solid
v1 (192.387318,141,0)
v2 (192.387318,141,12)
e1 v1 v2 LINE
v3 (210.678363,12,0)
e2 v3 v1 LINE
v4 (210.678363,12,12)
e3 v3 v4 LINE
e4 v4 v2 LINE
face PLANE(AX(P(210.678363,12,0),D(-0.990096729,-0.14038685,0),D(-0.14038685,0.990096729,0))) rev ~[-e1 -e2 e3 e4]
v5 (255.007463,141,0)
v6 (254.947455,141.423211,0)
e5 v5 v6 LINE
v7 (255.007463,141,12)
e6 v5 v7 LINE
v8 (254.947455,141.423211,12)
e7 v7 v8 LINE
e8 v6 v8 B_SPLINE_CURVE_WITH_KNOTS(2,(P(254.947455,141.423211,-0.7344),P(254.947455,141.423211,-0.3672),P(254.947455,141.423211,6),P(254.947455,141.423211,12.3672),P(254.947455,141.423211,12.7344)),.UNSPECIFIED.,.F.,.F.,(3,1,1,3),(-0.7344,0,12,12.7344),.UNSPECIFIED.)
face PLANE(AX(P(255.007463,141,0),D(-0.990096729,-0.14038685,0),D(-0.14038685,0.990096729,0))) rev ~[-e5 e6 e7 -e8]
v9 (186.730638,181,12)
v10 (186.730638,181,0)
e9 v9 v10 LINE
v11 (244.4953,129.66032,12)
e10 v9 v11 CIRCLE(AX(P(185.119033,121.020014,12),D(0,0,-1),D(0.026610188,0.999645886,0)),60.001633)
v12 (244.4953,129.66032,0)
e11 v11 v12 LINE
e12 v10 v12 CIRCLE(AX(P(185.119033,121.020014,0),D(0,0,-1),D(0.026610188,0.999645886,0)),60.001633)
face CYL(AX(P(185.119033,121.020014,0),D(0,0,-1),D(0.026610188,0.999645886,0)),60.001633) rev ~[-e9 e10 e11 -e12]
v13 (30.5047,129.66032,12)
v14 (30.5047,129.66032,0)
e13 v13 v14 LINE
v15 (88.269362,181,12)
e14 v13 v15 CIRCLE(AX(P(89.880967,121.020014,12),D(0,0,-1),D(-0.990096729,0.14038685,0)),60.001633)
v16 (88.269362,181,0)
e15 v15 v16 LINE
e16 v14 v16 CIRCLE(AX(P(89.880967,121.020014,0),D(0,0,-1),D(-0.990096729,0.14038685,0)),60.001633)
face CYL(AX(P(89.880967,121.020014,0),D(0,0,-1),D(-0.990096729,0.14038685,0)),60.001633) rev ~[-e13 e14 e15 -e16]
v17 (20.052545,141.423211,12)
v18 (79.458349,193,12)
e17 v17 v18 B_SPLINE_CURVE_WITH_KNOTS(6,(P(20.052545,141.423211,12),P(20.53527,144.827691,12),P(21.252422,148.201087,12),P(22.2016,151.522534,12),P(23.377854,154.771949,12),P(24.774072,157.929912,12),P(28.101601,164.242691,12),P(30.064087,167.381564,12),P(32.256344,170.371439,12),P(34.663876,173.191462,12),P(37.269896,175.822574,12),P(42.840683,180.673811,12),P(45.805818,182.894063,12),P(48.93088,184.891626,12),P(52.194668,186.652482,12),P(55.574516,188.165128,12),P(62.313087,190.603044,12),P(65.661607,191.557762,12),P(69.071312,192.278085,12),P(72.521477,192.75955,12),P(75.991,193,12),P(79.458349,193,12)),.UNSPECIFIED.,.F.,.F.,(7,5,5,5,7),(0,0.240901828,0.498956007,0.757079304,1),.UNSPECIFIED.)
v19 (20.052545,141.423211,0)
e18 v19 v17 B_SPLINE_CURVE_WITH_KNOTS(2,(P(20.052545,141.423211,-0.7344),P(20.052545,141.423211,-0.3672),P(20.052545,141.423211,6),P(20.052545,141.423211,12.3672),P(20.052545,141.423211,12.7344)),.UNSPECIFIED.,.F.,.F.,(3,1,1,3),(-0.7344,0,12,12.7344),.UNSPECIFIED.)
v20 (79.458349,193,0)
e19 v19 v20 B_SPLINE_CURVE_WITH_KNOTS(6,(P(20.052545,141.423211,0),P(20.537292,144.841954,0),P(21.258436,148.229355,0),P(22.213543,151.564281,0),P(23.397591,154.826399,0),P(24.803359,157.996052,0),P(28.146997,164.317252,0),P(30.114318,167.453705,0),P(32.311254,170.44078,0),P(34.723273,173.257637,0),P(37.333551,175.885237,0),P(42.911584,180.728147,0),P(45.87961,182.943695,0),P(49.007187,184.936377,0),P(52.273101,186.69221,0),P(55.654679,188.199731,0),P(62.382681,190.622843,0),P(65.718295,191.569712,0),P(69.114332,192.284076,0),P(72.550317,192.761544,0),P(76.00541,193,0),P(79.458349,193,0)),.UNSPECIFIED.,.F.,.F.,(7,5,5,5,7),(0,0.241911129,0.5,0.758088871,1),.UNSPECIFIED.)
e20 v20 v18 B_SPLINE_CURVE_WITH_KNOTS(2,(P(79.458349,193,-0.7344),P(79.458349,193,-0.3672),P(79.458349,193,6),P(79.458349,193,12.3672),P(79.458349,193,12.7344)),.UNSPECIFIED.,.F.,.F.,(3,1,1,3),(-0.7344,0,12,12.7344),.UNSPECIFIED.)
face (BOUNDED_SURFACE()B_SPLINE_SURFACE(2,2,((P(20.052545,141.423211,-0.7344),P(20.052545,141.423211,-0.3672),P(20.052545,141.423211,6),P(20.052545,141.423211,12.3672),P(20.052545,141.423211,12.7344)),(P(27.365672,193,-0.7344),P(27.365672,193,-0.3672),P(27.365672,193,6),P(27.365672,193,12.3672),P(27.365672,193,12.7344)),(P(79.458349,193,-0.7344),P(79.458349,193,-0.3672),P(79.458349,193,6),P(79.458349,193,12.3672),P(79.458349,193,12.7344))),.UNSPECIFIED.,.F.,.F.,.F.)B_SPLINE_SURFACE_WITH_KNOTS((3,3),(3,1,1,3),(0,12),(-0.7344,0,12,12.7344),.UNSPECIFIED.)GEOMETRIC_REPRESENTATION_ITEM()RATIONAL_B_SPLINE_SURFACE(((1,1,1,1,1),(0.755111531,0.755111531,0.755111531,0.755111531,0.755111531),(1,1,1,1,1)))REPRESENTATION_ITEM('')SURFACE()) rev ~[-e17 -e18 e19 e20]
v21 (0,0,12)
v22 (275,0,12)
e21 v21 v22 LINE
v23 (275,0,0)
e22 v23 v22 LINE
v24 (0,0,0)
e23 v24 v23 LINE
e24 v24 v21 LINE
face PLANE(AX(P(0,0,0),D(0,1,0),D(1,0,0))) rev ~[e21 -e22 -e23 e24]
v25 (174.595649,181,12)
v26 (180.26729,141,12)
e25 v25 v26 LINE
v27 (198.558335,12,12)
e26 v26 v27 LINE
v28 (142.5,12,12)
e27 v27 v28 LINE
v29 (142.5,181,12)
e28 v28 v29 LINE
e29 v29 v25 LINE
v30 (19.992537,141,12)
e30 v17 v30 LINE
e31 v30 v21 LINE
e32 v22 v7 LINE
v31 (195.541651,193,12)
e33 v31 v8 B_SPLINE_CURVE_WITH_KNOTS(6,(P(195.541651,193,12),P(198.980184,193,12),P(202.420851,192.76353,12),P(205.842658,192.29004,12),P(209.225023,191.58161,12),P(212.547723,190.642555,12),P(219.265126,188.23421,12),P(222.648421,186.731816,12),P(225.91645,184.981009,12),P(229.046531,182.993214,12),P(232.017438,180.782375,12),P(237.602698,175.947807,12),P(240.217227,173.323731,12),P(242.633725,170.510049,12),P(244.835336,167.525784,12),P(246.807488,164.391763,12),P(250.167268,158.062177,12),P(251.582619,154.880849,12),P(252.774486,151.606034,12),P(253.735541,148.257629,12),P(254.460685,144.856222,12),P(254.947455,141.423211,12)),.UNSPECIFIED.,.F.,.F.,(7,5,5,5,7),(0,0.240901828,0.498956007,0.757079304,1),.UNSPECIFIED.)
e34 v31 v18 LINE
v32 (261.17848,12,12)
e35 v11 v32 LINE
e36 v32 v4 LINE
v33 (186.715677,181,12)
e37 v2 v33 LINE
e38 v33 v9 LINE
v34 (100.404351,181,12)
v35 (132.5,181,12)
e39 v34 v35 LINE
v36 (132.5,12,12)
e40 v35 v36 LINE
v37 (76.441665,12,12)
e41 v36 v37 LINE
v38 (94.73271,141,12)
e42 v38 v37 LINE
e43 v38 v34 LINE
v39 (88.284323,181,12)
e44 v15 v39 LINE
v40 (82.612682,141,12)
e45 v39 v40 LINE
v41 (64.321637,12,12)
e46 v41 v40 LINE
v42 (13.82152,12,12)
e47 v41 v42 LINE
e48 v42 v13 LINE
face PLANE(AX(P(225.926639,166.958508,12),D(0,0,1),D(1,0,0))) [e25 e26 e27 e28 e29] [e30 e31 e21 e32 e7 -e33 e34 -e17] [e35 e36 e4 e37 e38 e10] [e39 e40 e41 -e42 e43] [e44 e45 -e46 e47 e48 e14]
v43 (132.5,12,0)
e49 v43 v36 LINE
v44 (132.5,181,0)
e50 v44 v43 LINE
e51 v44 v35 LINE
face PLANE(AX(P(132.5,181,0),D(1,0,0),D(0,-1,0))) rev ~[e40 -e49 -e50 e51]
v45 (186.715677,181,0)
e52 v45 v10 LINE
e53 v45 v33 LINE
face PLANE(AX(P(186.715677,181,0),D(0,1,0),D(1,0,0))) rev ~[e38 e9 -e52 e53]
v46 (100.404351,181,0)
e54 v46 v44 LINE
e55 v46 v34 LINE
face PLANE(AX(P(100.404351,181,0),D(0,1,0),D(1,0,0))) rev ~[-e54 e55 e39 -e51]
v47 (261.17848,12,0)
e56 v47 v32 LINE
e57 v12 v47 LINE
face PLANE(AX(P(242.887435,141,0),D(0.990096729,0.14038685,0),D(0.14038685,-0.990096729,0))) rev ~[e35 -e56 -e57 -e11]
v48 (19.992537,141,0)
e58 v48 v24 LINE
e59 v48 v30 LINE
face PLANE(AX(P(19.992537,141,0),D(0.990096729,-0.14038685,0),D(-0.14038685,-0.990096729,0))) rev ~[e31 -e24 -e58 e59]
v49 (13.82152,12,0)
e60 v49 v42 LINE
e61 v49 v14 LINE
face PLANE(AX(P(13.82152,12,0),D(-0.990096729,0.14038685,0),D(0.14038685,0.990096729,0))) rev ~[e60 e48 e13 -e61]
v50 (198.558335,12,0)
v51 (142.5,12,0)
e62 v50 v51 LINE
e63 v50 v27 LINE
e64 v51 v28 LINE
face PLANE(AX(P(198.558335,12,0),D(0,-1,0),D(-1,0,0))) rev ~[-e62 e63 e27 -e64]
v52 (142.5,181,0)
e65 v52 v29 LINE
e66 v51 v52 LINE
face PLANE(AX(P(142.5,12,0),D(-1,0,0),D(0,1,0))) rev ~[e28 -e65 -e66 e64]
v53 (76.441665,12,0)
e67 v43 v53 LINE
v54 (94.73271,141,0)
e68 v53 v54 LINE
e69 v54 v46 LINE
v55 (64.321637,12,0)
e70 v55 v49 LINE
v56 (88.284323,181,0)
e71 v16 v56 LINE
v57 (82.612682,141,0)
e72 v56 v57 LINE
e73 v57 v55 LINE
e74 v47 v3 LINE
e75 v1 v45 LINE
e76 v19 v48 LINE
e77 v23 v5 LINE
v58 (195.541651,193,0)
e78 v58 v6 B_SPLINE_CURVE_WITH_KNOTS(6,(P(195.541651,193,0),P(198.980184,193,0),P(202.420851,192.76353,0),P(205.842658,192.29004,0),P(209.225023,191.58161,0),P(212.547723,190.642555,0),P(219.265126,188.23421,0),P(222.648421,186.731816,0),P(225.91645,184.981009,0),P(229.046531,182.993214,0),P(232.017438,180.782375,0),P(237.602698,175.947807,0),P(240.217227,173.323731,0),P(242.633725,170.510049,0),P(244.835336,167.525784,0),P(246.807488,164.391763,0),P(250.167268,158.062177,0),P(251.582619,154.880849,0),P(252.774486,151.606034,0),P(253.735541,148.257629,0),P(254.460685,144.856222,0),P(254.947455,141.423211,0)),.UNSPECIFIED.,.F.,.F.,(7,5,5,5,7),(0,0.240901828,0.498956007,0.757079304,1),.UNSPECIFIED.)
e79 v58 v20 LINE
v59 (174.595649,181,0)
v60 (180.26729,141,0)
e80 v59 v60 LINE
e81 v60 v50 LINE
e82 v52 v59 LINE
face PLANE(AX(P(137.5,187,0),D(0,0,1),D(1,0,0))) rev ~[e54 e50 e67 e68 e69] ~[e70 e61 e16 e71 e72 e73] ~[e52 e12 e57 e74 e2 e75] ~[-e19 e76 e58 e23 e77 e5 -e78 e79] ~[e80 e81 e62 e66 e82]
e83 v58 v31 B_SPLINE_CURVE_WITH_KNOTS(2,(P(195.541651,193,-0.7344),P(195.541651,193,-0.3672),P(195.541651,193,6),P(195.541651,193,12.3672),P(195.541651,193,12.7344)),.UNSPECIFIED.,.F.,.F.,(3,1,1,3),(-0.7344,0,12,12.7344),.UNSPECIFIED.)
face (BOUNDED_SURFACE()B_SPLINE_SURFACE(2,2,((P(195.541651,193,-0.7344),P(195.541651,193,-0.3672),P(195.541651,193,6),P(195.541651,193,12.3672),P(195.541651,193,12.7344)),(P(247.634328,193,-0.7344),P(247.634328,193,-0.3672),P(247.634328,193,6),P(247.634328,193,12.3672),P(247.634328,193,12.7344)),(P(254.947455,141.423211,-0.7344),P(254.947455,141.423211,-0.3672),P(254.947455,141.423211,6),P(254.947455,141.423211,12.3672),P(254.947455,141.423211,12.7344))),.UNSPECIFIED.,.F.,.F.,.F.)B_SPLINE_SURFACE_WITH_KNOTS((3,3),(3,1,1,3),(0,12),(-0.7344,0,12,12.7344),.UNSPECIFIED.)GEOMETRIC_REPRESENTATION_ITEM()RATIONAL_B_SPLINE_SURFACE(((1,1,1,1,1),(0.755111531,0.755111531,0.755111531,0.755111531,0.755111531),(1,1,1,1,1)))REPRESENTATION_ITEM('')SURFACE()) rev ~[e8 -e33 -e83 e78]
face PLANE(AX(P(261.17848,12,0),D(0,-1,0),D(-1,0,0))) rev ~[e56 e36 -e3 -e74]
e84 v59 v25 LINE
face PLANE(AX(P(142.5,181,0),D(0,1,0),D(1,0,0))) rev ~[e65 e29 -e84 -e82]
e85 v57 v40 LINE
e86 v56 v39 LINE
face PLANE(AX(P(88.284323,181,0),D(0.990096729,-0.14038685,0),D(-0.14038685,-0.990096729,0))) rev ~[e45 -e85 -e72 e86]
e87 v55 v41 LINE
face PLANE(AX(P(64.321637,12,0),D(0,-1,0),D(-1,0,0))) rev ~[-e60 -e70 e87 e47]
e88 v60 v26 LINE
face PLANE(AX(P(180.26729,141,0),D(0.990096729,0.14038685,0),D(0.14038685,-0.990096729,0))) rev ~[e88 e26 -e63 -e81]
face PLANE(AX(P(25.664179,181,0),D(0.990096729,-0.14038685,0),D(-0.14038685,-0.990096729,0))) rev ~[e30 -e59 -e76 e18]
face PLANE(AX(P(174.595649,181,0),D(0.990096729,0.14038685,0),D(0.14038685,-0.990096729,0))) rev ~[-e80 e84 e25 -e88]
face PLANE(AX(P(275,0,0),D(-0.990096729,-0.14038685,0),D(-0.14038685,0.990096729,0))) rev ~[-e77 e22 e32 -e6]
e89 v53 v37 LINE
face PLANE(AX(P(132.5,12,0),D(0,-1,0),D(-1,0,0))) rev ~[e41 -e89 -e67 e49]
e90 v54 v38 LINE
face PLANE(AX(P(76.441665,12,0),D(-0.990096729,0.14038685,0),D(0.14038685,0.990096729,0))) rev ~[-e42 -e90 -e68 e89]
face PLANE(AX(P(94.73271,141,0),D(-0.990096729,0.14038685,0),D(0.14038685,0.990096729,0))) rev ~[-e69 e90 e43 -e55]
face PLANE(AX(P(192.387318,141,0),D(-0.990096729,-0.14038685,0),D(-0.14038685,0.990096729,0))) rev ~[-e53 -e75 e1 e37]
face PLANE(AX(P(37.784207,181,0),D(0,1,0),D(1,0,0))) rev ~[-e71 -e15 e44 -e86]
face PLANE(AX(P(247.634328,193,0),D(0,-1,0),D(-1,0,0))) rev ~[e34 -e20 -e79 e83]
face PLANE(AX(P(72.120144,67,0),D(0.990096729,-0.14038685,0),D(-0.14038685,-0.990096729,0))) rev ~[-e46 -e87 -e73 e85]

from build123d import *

# Parameters (mm, degrees)
F1_DEPTH    = 12
F2_T1_DEPTH = 12
F3_R        = 60


# Not quite as in the source:
# - a fillet or chamfer that OpenCascade refuses, or shapes differently, is made with other operations: its cross-section is extruded or revolved along the edge and cut away or added


with BuildPart() as f1:
    # F0 (on Top) → F1 (new body)
    with BuildSketch(Plane.XY):
        Polygon((132.5, 193), (132.5, 181), (137.5, 181), (142.5, 181), (142.5, 193), (137.5, 193), align=None)
        Polygon((27.3656716418, 193), (25.6641791045, 181), (37.7842070275, 181), (39.4856995648, 193), align=None)
        Polygon((25.6641791045, 181), (19.9925373134, 141), (32.1125652364, 141), (37.7842070275, 181), align=None)
        Polygon((19.9925373134, 141), (18.2910447761, 129), (30.4110726991, 129), (32.1125652364, 141), align=None)
        Polygon((237.2157929725, 181), (242.8874347636, 141), (255.0074626866, 141), (249.3358208955, 181), align=None)
        Polygon((235.5143004352, 193), (237.2157929725, 181), (249.3358208955, 181), (247.6343283582, 193), align=None)
        Polygon((242.8874347636, 141), (244.5889273009, 129), (256.7089552239, 129), (255.0074626866, 141), align=None)
        Polygon((244.5889273009, 129), (251.6784795397, 79), (263.7985074627, 79), (256.7089552239, 129), align=None)
        Polygon((251.6784795397, 79), (253.379972077, 67), (265.5, 67), (263.7985074627, 79), align=None)
        Polygon((132.5, 79), (132.5, 67), (137.5, 67), (142.5, 67), (142.5, 79), (137.5, 79), align=None)
        Polygon((253.379972077, 67), (261.1784795397, 12), (273.2985074627, 12), (265.5, 67), align=None)
        Polygon((261.1784795397, 12), (262.879972077, 0), (275, 0), (273.2985074627, 12), align=None)
        Polygon((13.8215204603, 12), (12.120027923, 0), (62.6201442689, 0), (64.3216368062, 12), align=None)
        Polygon((1.7014925373, 12), (0, 0), (12.120027923, 0), (13.8215204603, 12), align=None)
        Polygon((9.5, 67), (1.7014925373, 12), (13.8215204603, 12), (21.620027923, 67), align=None)
        Polygon((11.2014925373, 79), (9.5, 67), (21.620027923, 67), (23.3215204603, 79), align=None)
        Polygon((18.2910447761, 129), (11.2014925373, 79), (23.3215204603, 79), (30.4110726991, 129), align=None)
        Polygon((132.5, 141), (132.5, 129), (137.5, 129), (142.5, 129), (142.5, 141), (137.5, 141), align=None)
        Polygon((72.1201442689, 67), (64.3216368062, 12), (76.4416647292, 12), (84.2401721919, 67), align=None)
        Polygon((80.911189045, 129), (73.8216368062, 79), (85.9416647292, 79), (93.031216968, 129), align=None)
        Polygon((88.2843233734, 181), (82.6126815823, 141), (94.7327095053, 141), (100.4043512964, 181), align=None)
        Polygon((39.4856995648, 193), (37.7842070275, 181), (88.2843233734, 181), (89.9858159107, 193), align=None)
        Polygon((102.1058438337, 193), (100.4043512964, 181), (132.5, 181), (132.5, 193), align=None)
        Polygon((142.5, 193), (142.5, 181), (174.5956487036, 181), (172.8941561663, 193), align=None)
        Polygon((185.0141840893, 193), (186.7156766266, 181), (237.2157929725, 181), (235.5143004352, 193), align=None)
        Polygon((172.8941561663, 193), (174.5956487036, 181), (186.7156766266, 181), (185.0141840893, 193), align=None)
        Polygon((174.5956487036, 181), (180.2672904947, 141), (192.3873184177, 141), (186.7156766266, 181), align=None)
        Polygon((180.2672904947, 141), (181.968783032, 129), (194.088810955, 129), (192.3873184177, 141), align=None)
        Polygon((181.968783032, 129), (189.0583352708, 79), (201.1783631938, 79), (194.088810955, 129), align=None)
        Polygon((189.0583352708, 79), (190.7598278081, 67), (202.8798557311, 67), (201.1783631938, 79), align=None)
        Polygon((190.7598278081, 67), (198.5583352708, 12), (210.6783631938, 12), (202.8798557311, 67), align=None)
        Polygon((210.6783631938, 12), (212.3798557311, 0), (262.879972077, 0), (261.1784795397, 12), align=None)
        Polygon((198.5583352708, 12), (200.2598278081, 0), (212.3798557311, 0), (210.6783631938, 12), align=None)
        Polygon((142.5, 12), (142.5, 0), (200.2598278081, 0), (198.5583352708, 12), align=None)
        Polygon((132.5, 12), (132.5, 0), (142.5, 0), (142.5, 12), (137.5, 12), align=None)
        Polygon((76.4416647292, 12), (74.7401721919, 0), (132.5, 0), (132.5, 12), align=None)
        Polygon((64.3216368062, 12), (62.6201442689, 0), (74.7401721919, 0), (76.4416647292, 12), align=None)
        Polygon((132.5, 67), (132.5, 12), (137.5, 12), (142.5, 12), (142.5, 67), (137.5, 67), align=None)
        Polygon((132.5, 129), (132.5, 79), (137.5, 79), (142.5, 79), (142.5, 129), (137.5, 129), align=None)
        Polygon((132.5, 181), (132.5, 141), (137.5, 141), (142.5, 141), (142.5, 181), (137.5, 181), align=None)
        Polygon((89.9858159107, 193), (88.2843233734, 181), (100.4043512964, 181), (102.1058438337, 193), align=None)
        Polygon((82.6126815823, 141), (80.911189045, 129), (93.031216968, 129), (94.7327095053, 141), align=None)
        Polygon((73.8216368062, 79), (72.1201442689, 67), (84.2401721919, 67), (85.9416647292, 79), align=None)
    extrude(amount=F1_DEPTH)

    # F2: fillet of radius 60 on 2 edges, made by hand

    # F2_s2 → F2_t1 (join)
    with BuildSketch(Plane.XY):
        with BuildLine():
            ThreePointArc((186.7156872707, 181.0003998584), (225.0552814168, 165.8005010735), (244.5264534747, 129.4434541493))
            Line((244.5264534747, 129.4434541493), (250.4671955698, 130.2857981777))
            ThreePointArc((250.4671955698, 130.2857981777), (246.8116672993, 156.0640430257), (243.1565350676, 181.8423440284))
            Line((243.1565350676, 181.8423440284), (237.2157929725, 187.0001633397))
            ThreePointArc((237.2157929725, 187.0001633397), (211.9657401216, 187.0001633397), (186.8753527454, 186.9984384577))
            Line((186.8753527454, 186.9984384577), (186.7156872707, 181.0003998584))
        make_face()
        with BuildLine():
            ThreePointArc((30.4735465253, 129.4434541493), (49.9447185832, 165.8005010735), (88.2843127293, 181.0003998584))
            Line((88.2843127293, 181.0003998584), (88.1246472546, 186.9984384577))
            ThreePointArc((88.1246472546, 186.9984384577), (63.0342598784, 187.0001633397), (37.7842070275, 187.0001633397))
            Line((37.7842070275, 187.0001633397), (31.8434649324, 181.8423440284))
            ThreePointArc((31.8434649324, 181.8423440284), (28.1883327007, 156.0640430257), (24.5328044302, 130.2857981777))
            Line((24.5328044302, 130.2857981777), (30.4735465253, 129.4434541493))
        make_face()
    extrude(amount=F2_T1_DEPTH)

    # F3
    f3_edges = [f1.edges().sort_by_distance(p)[0] for p in [
        (27.365672, 193, 6),
        (247.634328, 193, 6),
    ]]
    fillet(f3_edges, radius=F3_R)


solid = f1.part
